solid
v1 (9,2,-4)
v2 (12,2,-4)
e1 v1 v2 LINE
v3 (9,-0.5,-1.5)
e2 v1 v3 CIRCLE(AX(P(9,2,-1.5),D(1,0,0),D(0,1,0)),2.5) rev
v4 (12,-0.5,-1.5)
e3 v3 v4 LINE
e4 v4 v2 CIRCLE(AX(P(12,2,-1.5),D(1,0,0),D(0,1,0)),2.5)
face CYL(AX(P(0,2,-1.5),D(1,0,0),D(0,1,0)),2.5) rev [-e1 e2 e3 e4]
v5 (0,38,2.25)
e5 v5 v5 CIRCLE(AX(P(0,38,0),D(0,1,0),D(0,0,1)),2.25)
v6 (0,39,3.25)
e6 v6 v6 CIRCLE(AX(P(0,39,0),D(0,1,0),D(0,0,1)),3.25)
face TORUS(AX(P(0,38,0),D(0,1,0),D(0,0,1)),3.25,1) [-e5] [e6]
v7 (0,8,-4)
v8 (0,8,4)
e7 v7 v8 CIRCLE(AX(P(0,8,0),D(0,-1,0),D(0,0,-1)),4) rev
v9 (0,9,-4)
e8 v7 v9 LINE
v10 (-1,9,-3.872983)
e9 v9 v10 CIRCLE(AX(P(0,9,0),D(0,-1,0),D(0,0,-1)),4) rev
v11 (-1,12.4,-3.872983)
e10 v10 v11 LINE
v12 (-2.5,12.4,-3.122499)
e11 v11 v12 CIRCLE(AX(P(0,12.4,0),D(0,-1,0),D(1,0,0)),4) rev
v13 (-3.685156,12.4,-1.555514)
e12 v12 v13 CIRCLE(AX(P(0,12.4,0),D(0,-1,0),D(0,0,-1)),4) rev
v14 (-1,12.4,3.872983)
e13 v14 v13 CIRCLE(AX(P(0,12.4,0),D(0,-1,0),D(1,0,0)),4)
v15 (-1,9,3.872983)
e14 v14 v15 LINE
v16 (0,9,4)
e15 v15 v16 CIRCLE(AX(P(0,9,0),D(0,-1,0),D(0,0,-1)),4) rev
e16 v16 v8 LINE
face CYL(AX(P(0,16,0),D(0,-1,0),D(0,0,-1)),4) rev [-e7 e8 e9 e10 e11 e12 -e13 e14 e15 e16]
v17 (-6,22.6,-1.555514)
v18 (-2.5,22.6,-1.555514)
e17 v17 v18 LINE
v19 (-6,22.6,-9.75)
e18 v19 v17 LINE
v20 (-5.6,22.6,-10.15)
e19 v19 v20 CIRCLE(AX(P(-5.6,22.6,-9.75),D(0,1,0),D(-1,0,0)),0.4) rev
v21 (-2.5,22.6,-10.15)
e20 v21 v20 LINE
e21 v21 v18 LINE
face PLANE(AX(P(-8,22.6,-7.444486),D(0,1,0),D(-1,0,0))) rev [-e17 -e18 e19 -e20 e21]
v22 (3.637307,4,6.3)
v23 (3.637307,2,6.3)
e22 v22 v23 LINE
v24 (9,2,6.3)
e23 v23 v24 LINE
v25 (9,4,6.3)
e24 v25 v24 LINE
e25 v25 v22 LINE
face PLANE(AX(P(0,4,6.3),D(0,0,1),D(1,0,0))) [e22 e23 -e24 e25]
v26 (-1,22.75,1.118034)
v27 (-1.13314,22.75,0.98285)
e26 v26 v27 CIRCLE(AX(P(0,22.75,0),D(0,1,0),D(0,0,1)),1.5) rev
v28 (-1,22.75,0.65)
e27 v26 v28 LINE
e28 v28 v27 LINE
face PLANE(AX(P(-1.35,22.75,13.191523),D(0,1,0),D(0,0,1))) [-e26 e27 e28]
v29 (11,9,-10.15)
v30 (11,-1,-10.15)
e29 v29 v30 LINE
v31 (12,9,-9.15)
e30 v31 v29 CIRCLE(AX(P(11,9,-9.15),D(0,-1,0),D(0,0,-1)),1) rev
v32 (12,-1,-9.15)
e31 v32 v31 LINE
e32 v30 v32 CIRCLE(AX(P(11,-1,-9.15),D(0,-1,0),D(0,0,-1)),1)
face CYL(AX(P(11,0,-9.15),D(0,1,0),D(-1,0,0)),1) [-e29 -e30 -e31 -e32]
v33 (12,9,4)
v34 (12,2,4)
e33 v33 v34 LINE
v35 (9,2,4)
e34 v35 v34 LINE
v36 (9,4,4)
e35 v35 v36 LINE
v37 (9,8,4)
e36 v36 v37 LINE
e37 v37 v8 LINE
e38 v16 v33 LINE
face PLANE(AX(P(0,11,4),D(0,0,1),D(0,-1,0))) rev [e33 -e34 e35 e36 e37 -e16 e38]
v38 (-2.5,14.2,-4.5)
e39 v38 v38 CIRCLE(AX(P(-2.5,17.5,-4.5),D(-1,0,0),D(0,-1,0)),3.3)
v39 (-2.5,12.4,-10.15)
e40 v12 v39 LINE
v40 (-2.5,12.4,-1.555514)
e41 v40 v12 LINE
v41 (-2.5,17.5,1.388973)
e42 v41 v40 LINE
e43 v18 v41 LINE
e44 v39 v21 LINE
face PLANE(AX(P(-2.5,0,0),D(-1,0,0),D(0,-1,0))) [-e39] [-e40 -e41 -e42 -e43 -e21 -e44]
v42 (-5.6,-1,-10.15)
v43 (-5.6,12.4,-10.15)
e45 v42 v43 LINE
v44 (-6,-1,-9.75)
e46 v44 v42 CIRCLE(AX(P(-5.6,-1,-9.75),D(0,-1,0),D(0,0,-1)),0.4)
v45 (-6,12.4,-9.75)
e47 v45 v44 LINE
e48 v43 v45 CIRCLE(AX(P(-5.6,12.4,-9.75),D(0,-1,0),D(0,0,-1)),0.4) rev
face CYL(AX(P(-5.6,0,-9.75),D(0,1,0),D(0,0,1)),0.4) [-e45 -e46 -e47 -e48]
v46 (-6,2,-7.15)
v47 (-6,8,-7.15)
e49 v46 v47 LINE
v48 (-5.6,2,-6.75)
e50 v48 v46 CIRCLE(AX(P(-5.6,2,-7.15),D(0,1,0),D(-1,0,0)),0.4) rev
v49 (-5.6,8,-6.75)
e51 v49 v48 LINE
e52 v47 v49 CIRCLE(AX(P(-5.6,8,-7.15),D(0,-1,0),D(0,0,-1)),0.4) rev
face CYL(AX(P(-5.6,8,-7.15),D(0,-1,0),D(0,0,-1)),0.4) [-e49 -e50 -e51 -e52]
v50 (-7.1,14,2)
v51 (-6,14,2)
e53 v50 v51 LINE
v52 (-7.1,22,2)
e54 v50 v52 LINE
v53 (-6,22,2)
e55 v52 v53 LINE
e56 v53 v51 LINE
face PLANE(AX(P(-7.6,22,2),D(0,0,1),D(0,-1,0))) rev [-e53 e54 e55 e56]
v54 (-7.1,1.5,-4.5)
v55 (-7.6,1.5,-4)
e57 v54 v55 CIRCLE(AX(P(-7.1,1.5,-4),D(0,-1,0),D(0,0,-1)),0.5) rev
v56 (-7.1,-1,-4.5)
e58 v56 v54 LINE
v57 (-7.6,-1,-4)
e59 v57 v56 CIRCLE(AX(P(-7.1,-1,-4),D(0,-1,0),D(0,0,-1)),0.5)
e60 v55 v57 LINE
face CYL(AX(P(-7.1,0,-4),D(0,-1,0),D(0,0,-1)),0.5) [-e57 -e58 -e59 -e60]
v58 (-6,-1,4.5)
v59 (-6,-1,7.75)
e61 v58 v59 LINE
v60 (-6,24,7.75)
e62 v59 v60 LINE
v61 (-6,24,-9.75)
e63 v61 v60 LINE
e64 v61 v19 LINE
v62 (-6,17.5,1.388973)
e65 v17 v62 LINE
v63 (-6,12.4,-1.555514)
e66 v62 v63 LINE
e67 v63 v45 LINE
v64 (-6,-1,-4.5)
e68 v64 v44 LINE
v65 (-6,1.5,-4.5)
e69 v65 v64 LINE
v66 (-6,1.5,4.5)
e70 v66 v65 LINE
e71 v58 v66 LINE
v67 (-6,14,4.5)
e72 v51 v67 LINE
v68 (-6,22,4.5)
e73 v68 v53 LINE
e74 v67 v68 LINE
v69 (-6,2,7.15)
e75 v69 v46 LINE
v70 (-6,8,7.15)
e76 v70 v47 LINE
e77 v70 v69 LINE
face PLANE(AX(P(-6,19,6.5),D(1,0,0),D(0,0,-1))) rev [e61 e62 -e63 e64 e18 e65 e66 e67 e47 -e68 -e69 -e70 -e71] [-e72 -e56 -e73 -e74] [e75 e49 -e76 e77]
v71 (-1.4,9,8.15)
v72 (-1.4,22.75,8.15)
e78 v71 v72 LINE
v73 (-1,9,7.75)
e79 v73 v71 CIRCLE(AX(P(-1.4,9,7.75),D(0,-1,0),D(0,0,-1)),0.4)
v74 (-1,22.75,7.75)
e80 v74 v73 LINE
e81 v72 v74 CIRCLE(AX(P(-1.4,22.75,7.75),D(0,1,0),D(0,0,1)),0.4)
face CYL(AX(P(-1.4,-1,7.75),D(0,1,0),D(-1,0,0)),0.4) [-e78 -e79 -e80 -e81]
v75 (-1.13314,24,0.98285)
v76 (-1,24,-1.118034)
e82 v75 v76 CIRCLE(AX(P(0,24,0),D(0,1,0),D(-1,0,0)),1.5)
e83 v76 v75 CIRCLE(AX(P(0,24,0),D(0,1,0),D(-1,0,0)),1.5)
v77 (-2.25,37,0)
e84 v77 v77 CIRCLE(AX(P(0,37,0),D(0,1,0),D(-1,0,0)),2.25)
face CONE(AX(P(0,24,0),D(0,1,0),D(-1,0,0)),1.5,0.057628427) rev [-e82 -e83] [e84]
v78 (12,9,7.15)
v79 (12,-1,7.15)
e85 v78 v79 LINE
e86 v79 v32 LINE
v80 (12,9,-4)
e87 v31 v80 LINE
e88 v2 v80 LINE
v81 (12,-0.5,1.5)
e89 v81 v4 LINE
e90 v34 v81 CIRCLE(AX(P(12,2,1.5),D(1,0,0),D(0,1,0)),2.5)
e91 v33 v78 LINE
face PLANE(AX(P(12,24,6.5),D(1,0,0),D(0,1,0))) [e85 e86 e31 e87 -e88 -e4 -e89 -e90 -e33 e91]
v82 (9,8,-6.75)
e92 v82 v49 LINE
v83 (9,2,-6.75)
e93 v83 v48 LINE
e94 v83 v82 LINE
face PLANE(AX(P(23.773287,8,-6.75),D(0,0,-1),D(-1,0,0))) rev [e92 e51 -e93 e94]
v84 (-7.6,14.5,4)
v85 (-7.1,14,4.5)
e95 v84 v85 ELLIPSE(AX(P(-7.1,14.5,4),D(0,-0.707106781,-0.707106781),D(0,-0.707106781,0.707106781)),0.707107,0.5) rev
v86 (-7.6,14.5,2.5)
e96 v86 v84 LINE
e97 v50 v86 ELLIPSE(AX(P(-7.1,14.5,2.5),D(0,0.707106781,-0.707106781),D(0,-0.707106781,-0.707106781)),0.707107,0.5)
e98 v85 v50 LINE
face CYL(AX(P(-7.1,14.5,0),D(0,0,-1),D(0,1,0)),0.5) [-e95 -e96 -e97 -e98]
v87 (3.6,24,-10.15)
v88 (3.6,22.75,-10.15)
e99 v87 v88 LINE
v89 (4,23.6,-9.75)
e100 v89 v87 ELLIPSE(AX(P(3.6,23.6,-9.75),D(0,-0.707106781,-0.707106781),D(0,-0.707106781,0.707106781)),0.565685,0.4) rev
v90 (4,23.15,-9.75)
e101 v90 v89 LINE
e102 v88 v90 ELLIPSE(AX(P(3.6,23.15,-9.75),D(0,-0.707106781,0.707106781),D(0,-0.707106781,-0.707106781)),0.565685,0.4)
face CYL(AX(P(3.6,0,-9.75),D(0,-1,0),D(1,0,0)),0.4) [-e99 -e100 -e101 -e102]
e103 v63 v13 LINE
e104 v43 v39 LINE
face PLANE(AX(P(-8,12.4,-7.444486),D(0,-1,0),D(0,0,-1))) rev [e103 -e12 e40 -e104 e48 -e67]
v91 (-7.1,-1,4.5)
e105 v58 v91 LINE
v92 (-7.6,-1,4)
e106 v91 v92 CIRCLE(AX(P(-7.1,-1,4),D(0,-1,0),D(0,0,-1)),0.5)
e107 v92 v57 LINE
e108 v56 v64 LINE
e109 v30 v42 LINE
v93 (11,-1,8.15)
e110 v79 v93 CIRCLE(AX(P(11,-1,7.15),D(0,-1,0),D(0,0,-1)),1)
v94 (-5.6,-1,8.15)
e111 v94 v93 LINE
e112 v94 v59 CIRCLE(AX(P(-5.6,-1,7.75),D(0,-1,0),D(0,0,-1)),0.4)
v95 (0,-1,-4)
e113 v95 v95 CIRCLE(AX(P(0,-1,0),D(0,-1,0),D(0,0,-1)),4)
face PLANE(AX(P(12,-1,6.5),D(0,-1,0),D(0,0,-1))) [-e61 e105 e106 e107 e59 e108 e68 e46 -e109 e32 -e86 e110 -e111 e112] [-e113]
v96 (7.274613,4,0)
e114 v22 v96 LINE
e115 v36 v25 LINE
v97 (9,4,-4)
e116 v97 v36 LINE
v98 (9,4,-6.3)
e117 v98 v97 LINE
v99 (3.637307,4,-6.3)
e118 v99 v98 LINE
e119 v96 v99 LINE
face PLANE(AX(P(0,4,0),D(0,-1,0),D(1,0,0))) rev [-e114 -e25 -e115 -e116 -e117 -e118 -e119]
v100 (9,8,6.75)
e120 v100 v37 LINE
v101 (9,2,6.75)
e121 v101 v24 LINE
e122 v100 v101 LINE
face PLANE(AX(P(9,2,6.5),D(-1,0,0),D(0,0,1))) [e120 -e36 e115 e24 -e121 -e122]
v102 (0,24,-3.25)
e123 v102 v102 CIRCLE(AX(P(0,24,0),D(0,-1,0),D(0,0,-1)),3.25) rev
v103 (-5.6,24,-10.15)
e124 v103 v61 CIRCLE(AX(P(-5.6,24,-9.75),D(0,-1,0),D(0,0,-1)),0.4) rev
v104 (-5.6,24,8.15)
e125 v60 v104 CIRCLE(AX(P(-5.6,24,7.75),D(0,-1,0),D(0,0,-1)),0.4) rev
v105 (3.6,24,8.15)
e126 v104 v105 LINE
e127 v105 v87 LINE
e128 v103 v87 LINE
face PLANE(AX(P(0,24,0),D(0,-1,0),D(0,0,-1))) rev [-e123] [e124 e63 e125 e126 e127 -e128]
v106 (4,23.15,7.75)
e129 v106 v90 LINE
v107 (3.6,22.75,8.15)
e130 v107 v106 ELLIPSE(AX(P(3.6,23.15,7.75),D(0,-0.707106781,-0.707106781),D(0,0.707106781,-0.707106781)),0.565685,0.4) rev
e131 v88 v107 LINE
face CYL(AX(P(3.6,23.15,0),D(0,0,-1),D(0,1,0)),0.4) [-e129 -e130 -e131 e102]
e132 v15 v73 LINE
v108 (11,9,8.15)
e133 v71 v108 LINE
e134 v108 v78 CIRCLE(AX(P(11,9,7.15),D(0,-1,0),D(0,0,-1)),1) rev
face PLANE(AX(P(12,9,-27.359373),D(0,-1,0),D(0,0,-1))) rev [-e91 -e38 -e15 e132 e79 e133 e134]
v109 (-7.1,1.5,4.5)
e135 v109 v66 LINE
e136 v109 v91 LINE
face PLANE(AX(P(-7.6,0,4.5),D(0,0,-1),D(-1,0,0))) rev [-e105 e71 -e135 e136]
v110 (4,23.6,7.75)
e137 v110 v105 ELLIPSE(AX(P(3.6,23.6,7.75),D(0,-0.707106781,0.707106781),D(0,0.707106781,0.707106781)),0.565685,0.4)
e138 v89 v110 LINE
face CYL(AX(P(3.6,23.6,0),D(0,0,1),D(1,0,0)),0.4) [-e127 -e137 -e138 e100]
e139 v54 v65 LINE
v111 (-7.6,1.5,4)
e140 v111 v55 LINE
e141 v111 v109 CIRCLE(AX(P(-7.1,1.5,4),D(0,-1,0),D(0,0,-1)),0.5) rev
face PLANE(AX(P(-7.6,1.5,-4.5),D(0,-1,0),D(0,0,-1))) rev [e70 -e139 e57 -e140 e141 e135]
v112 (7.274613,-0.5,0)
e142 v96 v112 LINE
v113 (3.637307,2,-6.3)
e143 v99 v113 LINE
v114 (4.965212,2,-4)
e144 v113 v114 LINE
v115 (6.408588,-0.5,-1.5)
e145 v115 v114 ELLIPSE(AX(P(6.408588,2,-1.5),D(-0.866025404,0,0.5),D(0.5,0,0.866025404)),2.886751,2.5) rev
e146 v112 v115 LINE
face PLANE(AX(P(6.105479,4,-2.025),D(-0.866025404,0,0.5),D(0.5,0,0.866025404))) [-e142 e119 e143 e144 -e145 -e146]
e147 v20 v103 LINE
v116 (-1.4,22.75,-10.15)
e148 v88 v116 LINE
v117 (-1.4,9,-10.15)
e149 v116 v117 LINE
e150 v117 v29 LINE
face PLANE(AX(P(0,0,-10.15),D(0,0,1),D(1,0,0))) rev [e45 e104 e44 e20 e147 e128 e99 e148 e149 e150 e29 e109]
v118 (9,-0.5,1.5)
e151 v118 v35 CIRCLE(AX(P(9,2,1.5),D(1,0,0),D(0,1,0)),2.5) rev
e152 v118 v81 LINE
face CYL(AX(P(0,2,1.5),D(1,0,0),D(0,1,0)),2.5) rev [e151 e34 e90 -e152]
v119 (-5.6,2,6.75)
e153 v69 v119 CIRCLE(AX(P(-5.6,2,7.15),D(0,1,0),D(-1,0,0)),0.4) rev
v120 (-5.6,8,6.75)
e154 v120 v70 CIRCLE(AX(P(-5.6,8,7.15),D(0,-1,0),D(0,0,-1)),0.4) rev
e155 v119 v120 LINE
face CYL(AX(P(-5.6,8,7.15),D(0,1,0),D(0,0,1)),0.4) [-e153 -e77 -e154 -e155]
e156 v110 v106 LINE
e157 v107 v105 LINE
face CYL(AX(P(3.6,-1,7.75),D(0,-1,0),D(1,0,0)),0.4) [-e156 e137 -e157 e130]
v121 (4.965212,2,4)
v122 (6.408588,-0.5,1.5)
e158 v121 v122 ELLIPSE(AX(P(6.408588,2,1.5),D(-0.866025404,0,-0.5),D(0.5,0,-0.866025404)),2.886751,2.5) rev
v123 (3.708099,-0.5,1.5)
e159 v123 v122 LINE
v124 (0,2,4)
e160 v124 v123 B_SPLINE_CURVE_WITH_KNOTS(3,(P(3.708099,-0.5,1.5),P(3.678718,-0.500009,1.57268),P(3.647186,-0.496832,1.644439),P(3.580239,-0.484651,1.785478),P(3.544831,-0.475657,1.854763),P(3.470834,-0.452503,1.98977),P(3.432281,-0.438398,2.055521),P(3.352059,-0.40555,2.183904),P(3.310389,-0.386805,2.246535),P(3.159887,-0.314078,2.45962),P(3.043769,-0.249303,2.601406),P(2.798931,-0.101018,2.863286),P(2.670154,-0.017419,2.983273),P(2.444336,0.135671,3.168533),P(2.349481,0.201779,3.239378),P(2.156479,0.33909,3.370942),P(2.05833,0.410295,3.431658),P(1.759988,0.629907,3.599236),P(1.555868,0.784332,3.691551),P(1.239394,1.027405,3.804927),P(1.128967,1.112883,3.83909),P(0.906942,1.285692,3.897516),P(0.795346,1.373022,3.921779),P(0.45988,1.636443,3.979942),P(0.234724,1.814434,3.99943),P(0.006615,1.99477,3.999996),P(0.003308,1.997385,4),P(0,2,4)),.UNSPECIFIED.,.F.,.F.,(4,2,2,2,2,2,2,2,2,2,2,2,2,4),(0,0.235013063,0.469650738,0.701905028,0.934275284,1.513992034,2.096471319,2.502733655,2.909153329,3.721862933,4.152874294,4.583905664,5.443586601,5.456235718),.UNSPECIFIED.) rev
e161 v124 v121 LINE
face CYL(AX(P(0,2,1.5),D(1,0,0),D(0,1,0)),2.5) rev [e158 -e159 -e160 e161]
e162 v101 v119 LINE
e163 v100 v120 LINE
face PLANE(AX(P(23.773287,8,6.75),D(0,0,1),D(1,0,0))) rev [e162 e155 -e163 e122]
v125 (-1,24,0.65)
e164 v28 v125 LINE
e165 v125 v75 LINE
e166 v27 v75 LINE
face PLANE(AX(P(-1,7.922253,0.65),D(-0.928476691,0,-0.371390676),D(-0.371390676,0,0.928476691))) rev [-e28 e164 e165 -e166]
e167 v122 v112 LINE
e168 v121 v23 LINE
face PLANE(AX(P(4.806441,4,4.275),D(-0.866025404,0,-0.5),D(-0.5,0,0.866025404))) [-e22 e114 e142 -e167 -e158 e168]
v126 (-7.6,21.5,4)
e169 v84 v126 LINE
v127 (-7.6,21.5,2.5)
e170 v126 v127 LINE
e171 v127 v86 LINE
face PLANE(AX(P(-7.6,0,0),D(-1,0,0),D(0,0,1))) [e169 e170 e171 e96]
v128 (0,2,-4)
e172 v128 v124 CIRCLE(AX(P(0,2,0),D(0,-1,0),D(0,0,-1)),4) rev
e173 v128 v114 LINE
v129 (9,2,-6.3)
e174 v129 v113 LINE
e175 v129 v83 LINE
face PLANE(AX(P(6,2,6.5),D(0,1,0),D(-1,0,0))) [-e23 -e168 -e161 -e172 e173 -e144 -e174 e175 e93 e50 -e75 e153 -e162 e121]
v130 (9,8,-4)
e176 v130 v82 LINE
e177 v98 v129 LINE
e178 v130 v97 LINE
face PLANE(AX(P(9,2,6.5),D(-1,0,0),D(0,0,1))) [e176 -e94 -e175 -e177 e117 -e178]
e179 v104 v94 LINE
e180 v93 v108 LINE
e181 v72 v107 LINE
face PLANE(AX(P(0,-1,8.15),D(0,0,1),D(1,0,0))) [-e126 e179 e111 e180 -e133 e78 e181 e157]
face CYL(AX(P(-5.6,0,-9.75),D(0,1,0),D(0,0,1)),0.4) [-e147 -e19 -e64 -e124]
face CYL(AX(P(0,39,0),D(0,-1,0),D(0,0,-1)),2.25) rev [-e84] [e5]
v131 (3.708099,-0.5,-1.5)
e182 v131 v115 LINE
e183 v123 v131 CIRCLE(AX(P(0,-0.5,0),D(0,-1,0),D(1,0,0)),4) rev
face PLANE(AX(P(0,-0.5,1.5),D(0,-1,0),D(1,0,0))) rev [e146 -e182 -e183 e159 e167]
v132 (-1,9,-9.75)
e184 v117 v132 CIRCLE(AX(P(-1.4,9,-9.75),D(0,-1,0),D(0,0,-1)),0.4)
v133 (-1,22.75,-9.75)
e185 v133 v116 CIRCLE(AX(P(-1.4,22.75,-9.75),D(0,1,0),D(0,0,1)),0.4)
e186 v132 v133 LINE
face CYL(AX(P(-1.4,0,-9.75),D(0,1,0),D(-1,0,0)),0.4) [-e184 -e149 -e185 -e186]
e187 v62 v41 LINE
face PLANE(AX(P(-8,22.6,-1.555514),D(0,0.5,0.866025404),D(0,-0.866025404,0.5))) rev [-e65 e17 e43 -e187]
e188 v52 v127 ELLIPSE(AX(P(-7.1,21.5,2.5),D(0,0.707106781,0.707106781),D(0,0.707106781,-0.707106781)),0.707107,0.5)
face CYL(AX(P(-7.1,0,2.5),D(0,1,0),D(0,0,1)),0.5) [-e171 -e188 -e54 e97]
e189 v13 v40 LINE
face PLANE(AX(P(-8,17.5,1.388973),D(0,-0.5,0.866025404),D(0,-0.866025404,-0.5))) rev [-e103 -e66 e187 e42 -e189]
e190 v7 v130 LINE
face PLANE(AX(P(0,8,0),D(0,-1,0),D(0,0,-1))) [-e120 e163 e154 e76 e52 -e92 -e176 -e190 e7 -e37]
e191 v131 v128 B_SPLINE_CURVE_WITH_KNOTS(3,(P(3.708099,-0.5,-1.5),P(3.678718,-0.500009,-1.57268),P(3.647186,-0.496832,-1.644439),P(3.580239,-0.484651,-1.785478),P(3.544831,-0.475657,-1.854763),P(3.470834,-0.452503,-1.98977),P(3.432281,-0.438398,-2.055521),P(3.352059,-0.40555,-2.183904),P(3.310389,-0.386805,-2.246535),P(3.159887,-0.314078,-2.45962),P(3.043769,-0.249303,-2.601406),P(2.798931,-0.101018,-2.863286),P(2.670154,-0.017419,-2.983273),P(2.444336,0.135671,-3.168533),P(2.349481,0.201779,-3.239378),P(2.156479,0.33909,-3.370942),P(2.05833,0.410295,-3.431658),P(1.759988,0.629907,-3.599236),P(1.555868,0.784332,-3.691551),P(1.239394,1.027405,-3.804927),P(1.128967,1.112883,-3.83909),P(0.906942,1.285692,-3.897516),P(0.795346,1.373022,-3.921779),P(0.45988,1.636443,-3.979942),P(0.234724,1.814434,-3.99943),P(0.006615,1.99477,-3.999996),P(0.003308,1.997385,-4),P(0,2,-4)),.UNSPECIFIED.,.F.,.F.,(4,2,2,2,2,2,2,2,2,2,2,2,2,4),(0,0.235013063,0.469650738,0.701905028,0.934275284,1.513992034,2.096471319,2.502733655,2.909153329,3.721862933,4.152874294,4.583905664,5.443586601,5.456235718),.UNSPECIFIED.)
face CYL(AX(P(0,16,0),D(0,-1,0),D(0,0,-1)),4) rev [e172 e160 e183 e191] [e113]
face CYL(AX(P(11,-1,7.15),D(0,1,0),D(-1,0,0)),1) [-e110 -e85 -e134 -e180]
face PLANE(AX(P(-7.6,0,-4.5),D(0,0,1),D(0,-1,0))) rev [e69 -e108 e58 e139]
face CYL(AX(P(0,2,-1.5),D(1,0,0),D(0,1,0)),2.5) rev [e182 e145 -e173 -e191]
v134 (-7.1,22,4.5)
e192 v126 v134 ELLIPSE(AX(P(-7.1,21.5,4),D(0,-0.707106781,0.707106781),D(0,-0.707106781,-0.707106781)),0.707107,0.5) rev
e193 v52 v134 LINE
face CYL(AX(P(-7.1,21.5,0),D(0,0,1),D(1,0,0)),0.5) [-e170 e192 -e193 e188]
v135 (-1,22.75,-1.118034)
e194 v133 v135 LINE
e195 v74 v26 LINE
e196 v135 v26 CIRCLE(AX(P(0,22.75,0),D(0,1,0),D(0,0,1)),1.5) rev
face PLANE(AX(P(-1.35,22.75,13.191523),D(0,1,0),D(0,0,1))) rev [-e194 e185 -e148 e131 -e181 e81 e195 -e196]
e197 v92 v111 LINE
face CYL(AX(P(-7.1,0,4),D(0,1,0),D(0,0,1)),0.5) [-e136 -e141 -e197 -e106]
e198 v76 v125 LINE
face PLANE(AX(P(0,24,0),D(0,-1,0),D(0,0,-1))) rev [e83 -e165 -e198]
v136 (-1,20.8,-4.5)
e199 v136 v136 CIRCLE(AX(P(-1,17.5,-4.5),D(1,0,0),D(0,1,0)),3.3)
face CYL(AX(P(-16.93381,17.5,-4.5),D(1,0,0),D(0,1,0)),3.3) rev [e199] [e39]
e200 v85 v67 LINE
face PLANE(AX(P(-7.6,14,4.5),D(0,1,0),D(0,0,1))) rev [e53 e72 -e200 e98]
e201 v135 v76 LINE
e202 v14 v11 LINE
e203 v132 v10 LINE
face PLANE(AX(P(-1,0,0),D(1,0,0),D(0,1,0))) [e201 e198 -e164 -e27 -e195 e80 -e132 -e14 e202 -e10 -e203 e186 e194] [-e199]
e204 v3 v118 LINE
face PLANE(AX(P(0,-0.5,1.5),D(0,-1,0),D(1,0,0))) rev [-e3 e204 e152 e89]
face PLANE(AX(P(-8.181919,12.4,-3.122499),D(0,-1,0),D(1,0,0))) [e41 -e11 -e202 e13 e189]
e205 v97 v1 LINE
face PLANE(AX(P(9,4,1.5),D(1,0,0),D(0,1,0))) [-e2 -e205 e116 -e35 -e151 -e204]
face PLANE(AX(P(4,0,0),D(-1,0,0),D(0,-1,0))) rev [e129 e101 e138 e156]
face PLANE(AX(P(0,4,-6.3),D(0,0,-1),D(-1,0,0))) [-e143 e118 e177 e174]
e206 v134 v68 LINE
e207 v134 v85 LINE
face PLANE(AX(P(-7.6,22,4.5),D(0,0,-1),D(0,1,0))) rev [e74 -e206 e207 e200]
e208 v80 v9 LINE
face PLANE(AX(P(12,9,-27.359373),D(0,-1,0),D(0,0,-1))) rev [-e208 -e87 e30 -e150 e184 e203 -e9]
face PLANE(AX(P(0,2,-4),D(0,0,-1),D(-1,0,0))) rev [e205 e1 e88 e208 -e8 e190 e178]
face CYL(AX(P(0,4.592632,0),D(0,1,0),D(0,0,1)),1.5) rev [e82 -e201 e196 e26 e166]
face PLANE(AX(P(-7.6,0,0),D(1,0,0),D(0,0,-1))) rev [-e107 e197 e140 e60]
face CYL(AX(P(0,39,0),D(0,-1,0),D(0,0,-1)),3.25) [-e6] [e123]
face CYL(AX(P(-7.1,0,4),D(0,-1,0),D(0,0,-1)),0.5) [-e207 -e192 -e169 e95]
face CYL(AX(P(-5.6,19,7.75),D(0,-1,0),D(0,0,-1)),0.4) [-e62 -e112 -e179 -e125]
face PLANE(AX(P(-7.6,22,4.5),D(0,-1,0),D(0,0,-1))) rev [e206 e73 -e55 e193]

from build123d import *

# Parameters (mm, degrees)
SKETCH1_W                        = 12
SKETCH1_H                        = 13
BOSS_EXTRUDE1_DEPTH              = 19
SKETCH2_R                        = 4
CUT_EXTRUDE1_DEPTH               = 16
CUT_EXTRUDE2_START               = -2
SKETCH3_W                        = 12
SKETCH3_H                        = 13
CUT_EXTRUDE2_DEPTH               = 6
SKETCH5_W                        = 12
SKETCH5_H                        = 13
BOSS_EXTRUDE2_DEPTH              = 5
FILLET1_R                        = 2
FILLET4_R                        = 2
SKETCH21_W                       = 2.5
SKETCH21_H                       = 8
SKETCH21_W_2                     = 9
SKETCH21_H_2                     = 1.5
BOSS_EXTRUDE4_DEPTH              = 1.6
FILLET3_R                        = 0.5
FILLET7_R                        = 0.5
FILLET5_R                        = 0.5
SKETCH23_R                       = 4
BOSS_EXTRUDE5_DEPTH              = 1
BOSS_EXTRUDE6_DEPTH              = 13
BOSS_EXTRUDE7_DEPTH              = 25
SKETCH34_W                       = 13.5
SKETCH34_H                       = 6
CUT_EXTRUDE5_DEPTH               = 15
M2_5_CLEARANCE_HOLE1_D           = 2.9
M2_5_CLEARANCE_HOLE1_DEPTH       = 19.128752102
M2_5_CLEARANCE_HOLE1_TIP         = 0.871247898
FILLET8_R                        = 0.4
SKETCH31_R                       = 3.25
SKETCH31_R_2                     = 2.25
BOSS_EXTRUDE8_DEPTH              = 15
FILLET9_R                        = 1
SKETCH9_R                        = 1
CUT_EXTRUDE6_DEPTH               = 29.903676278
CUT_EXTRUDE8_DEPTH               = 12
BOSS_EXTRUDE9_START              = -2.5
BOSS_EXTRUDE9_DEPTH              = 4.5
FILLET10_R                       = 1
CUT_EXTRUDE9_REACH               = 45.94
SKETCH48_W                       = 12
SKETCH48_H                       = 15
CUT_EXTRUDE10_START              = -2.5
CUT_EXTRUDE10_DEPTH              = 5.5
SKETCH50_W                       = 16.3
SKETCH50_H                       = 8
CUT_EXTRUDE11_DEPTH              = 1
CUT_EXTRUDE13_DEPTH              = 8
SKETCH51_W                       = 2.5
SKETCH51_H                       = 8
BOSS_EXTRUDE10_DEPTH             = 5
BOSS_EXTRUDE10_DIRECTION_2_REACH = 43.91
CUT_EXTRUDE12_DEPTH              = 2.5
CUT_EXTRUDE14_START              = -1.25
CUT_EXTRUDE14_DEPTH              = 5.5
BOSS_EXTRUDE11_DEPTH             = 1.25
SKETCH58_R                       = 3.3
CUT_EXTRUDE16_DEPTH              = 6.6
SKETCH65_W                       = 1
SKETCH65_H                       = 16.3
CUT_EXTRUDE17_DEPTH              = 7
BOSS_EXTRUDE12_DEPTH             = 2
FILLET11_R                       = 1
CUT_EXTRUDE18_DEPTH              = 6.75
BOSS_EXTRUDE13_DEPTH             = 6.75
FILLET12_R                       = 0.4
FILLET13_R                       = 0.4
BOSS_EXTRUDE18_DEPTH             = 1.5
BOSS_EXTRUDE19_REACH             = 44.344


with BuildPart() as part:
    # Sketch1 → Boss-Extrude1 (new body)
    with BuildSketch(Plane(origin=(0, 0, 0), x_dir=(1, 0, 0), z_dir=(0, 1, 0))):
        Rectangle(SKETCH1_W, SKETCH1_H)
    extrude(amount=BOSS_EXTRUDE1_DEPTH)

    # Sketch2 → Cut-Extrude1 (cut)
    with BuildSketch(Plane.XZ):
        with Locations(Location((0, 0, 0), (0, 0, 270))):
            Circle(SKETCH2_R)
    extrude(amount=-CUT_EXTRUDE1_DEPTH, mode=Mode.SUBTRACT)

    # Sketch3 → Cut-Extrude2 (cut)
    with BuildSketch(Plane.XZ.offset(CUT_EXTRUDE2_START)):
        Rectangle(SKETCH3_W, SKETCH3_H)
    extrude(amount=-CUT_EXTRUDE2_DEPTH, mode=Mode.SUBTRACT)


with BuildPart() as cut_extrude2_piece_1:
    # of the separate pieces the step leaves, piece 1, a body of its own (cut_extrude2_pieces)
    add(part.part.solids().sort_by_distance((-6, 8, 6.5))[0])

    # Sketch5 → Boss-Extrude2 (add)
    with BuildSketch(Plane(origin=(0, 19, 0), x_dir=(1, 0, 0), z_dir=(0, 1, 0))):
        Rectangle(SKETCH5_W, SKETCH5_H)
    extrude(amount=BOSS_EXTRUDE2_DEPTH)

    # Fillet1
    fillet1_edges = [cut_extrude2_piece_1.edges().sort_by_distance(p)[0] for p in [
        (-6, 16, -6.5),
        (-6, 16, 6.5),
    ]]
    fillet(fillet1_edges, radius=FILLET1_R)



with BuildPart() as cut_extrude2_piece_2:
    # of the separate pieces the step leaves, piece 2, a body of its own (cut_extrude2_pieces)
    add(part.part.solids().sort_by_distance((-6, 0, 6.5))[0])

    # Fillet4
    fillet4_edges = [cut_extrude2_piece_2.edges().sort_by_distance(p)[0] for p in [
        (-6, 1, 6.5),
        (-6, 1, -6.5),
    ]]
    fillet(fillet4_edges, radius=FILLET4_R)

    # Sketch21 → Boss-Extrude4 (add)
    with BuildSketch(Plane.ZY.offset(6)):
        with Locations((-3.25, 18)):
            Rectangle(SKETCH21_W, SKETCH21_H)
        with Locations((3.25, 18)):
            Rectangle(SKETCH21_W, SKETCH21_H)
        with Locations((0, 0.75)):
            Rectangle(SKETCH21_W_2, SKETCH21_H_2)
    extrude(amount=BOSS_EXTRUDE4_DEPTH)


with BuildPart() as boss_extrude4_piece_1:
    # of the separate pieces the step leaves, piece 1, a body of its own (boss_extrude4_pieces)
    add(cut_extrude2_piece_2.part.solids().sort_by_distance((-4, 0, 6.5))[0])

    # Fillet5
    fillet5_edges = [boss_extrude4_piece_1.edges().sort_by_distance(p)[0] for p in [
        (-7.6, 0.75, -4.5),
        (-7.6, 0.75, 4.5),
    ]]
    fillet(fillet5_edges, radius=FILLET5_R)

    # Sketch23 → Boss-Extrude5 (add)
    with BuildSketch(Plane.XZ):
        with BuildLine():
            Line((-7.6, 4), (-7.6, -4))
            ThreePointArc((-7.6, -4), (-7.453553391, -4.353553391), (-7.1, -4.5))
            Line((-7.1, -4.5), (-6, -4.5))
            ThreePointArc((-6, -4.5), (-5.414213562, -5.914213562), (-4, -6.5))
            Line((-4, -6.5), (6, -6.5))
            Line((6, -6.5), (6, 6.5))
            Line((6, 6.5), (-4, 6.5))
            ThreePointArc((-4, 6.5), (-5.414213562, 5.914213562), (-6, 4.5))
            Line((-6, 4.5), (-7.1, 4.5))
            ThreePointArc((-7.1, 4.5), (-7.453553391, 4.353553391), (-7.6, 4))
        make_face()
        with Locations(Location((0, 0, 0), (0, 0, 270))):
            Circle(SKETCH23_R, mode=Mode.SUBTRACT)
    extrude(amount=BOSS_EXTRUDE5_DEPTH)


with BuildPart() as boss_extrude4_piece_2:
    # of the separate pieces the step leaves, piece 2, a body of its own (boss_extrude4_pieces)
    add(cut_extrude2_piece_2.part.solids().sort_by_distance((-6, 22, -4.5))[0])

    # Fillet7
    fillet7_edges = [boss_extrude4_piece_2.edges().sort_by_distance(p)[0] for p in [
        (-7.6, 18, -2),
        (-7.6, 22, -3.25),
        (-7.6, 18, -4.5),
        (-7.6, 14, -3.25),
    ]]
    fillet(fillet7_edges, radius=FILLET7_R)


with BuildPart() as boss_extrude4_piece_3:
    # of the separate pieces the step leaves, piece 3, a body of its own (boss_extrude4_pieces)
    add(cut_extrude2_piece_2.part.solids().sort_by_distance((-6, 22, 2))[0])

    # Fillet3
    fillet3_edges = [boss_extrude4_piece_3.edges().sort_by_distance(p)[0] for p in [
        (-7.6, 22, 3.25),
        (-7.6, 18, 2),
        (-7.6, 14, 3.25),
        (-7.6, 18, 4.5),
    ]]
    fillet(fillet3_edges, radius=FILLET3_R)


with BuildPart() as cut_extrude2_piece_1_1:
    add(cut_extrude2_piece_1.part)

    add(boss_extrude4_piece_1.part)  # Boss-Extrude6 merges Boss-Extrude4 piece 1
    # Sketch26 → Boss-Extrude6 (add, through all)
    with BuildSketch(Plane(origin=(0, 0, -6.5), x_dir=(-1, 0, 0), z_dir=(0, 0, -1))):
        Polygon((-6, 24), (-12, 24), (-12, -1), (-6, -1), (-6, 2), (-9, 2), (-9, 8), (-6, 8), align=None)
    extrude(amount=-BOSS_EXTRUDE6_DEPTH)


    add(boss_extrude4_piece_2.part)  # Boss-Extrude7 merges Boss-Extrude4 piece 2

    add(boss_extrude4_piece_3.part)  # Boss-Extrude7 merges Boss-Extrude4 piece 3
    # Sketch30 → Boss-Extrude7 (add, through all)
    with BuildSketch(Plane(origin=(0, 24, 0), x_dir=(1, 0, 0), z_dir=(0, 1, 0))):
        with BuildLine():
            ThreePointArc((-6, 4.5), (-5.414213562, 5.914213562), (-4, 6.5))
            Line((-4, 6.5), (12, 6.5))
            Line((12, 6.5), (12, 8.15))
            Line((12, 8.15), (-6, 8.15))
            Line((-6, 8.15), (-6, 4.5))
        make_face()
        with BuildLine():
            Line((12, -6.5), (-4, -6.5))
            ThreePointArc((-4, -6.5), (-5.414213562, -5.914213562), (-6, -4.5))
            Line((-6, -4.5), (-6, -8.15))
            Line((-6, -8.15), (12, -8.15))
            Line((12, -8.15), (12, -6.5))
        make_face()
    extrude(amount=-BOSS_EXTRUDE7_DEPTH)

    # Sketch34 → Cut-Extrude5 (cut)
    with BuildSketch(Plane.ZY.offset(6)):
        with Locations((0, 5)):
            Rectangle(SKETCH34_W, SKETCH34_H)
    extrude(amount=-CUT_EXTRUDE5_DEPTH, mode=Mode.SUBTRACT)

    # M2.5 Clearance Hole1
    with Locations(Plane(origin=(12, 0, 0), x_dir=(0, 0, -1), z_dir=(1, 0, 0))):
        with Locations((4.5, 17.5)):
            Hole(M2_5_CLEARANCE_HOLE1_D / 2, depth=M2_5_CLEARANCE_HOLE1_DEPTH)
            with Locations((0, 0, -(M2_5_CLEARANCE_HOLE1_DEPTH + M2_5_CLEARANCE_HOLE1_TIP / 2))):  # 118° drill point
                Cone(0, M2_5_CLEARANCE_HOLE1_D / 2, M2_5_CLEARANCE_HOLE1_TIP, mode=Mode.SUBTRACT)

    # Fillet8
    fillet8_edges = [cut_extrude2_piece_1_1.edges().sort_by_distance(p)[0] for p in [
        (-6, 11.5, 8.15),
        (-6, 5, 6.75),
        (-6, 5, -6.75),
    ]]
    fillet(fillet8_edges, radius=FILLET8_R)

    # Sketch31 → Boss-Extrude8 (add)
    with BuildSketch(Plane(origin=(0, 24, 0), x_dir=(1, 0, 0), z_dir=(0, 1, 0))):
        with Locations(Location((0, 0, 0), (0, 0, 90))):
            Circle(SKETCH31_R)
        with Locations(Location((0, 0, 0), (0, 0, 270))):
            Circle(SKETCH31_R_2, mode=Mode.SUBTRACT)
    extrude(amount=BOSS_EXTRUDE8_DEPTH)

    # Fillet9
    fillet9_edges = [cut_extrude2_piece_1_1.edges().sort_by_distance(p)[0] for p in [
        (12, 11.5, 8.15),
    ]]
    fillet(fillet9_edges, radius=FILLET9_R)

    # Sketch9 → Cut-Extrude6 (cut, through all)
    with BuildSketch(Plane(origin=(0, 24, 0), x_dir=(1, 0, 0), z_dir=(0, 1, 0))):
        with Locations(Location((0, 0, 0), (0, 0, 270))):
            Circle(SKETCH9_R)
    extrude(amount=-CUT_EXTRUDE6_DEPTH, mode=Mode.SUBTRACT)

    # Sketch42 → Cut-Extrude8 (cut)
    with BuildSketch(Plane(origin=(12, 0, 0), x_dir=(0, 0, -1), z_dir=(1, 0, 0))):
        with BuildLine():
            Line((-1.5, 13.5), (1.5, 13.5))
            ThreePointArc((1.5, 13.5), (3.267766953, 12.767766953), (4, 11))
            Line((4, 11), (4, 2))
            ThreePointArc((4, 2), (3.267766953, 0.232233047), (1.5, -0.5))
            Line((1.5, -0.5), (-1.5, -0.5))
            ThreePointArc((-1.5, -0.5), (-3.267766953, 0.232233047), (-4, 2))
            Line((-4, 2), (-4, 11))
            ThreePointArc((-4, 11), (-3.267766953, 12.767766953), (-1.5, 13.5))
        make_face()
    extrude(amount=-CUT_EXTRUDE8_DEPTH, mode=Mode.SUBTRACT)

    # Sketch43 → Revolve1 (revolve)
    with BuildSketch(Plane.XY, mode=Mode.PRIVATE) as revolve1_sk:
        Polygon((1.5, 24), (2.25, 24), (2.25, 37), align=None)
    revolve(revolve1_sk.sketch.rotate(Axis((0, 39, 0), (0, -1, 0)), 180), axis=Axis((0, 39, 0), (0, -1, 0)))

    # Sketch45 → Boss-Extrude9 (add)
    with BuildSketch(Plane(origin=(0, 2, 0), x_dir=(1, 0, 0), z_dir=(0, 1, 0)).offset(BOSS_EXTRUDE9_START)):
        Polygon((3.637306696, -6.3), (7.274613392, 0), (3.637306696, 6.3), (9, 6.3), (9, -6.3), align=None)
    extrude(amount=BOSS_EXTRUDE9_DEPTH)

    # Fillet10
    fillet10_edges = [cut_extrude2_piece_1_1.edges().sort_by_distance(p)[0] for p in [
        (0, 39, -2.25),
    ]]
    fillet(fillet10_edges, radius=FILLET10_R - 0.0001)  # a hair under: the kernel refuses the full size

    # Cut-Extrude9: up to this face of the body (flat: up to its plane)
    cut_extrude9_end = Plane(cut_extrude2_piece_1_1.part.faces().sort_by_distance((3, 11.5, -8.15))[0])
    # Sketch48 → Cut-Extrude9 (cut, up to the picked face)
    with BuildSketch(Plane.XY.offset(8.15), mode=Mode.PRIVATE) as cut_extrude9_sk1:
        with Locations((6, 16.5)):
            Rectangle(SKETCH48_W, SKETCH48_H)
    cut_extrude9_tool1 = split(extrude(cut_extrude9_sk1.sketch, amount=-CUT_EXTRUDE9_REACH, mode=Mode.PRIVATE), bisect_by=cut_extrude9_end, keep=Keep.BOTH, mode=Mode.PRIVATE)
    add(cut_extrude9_tool1.solids().sort_by(Axis((6, 16.5, 8.15), (0, 0, -1)))[0], mode=Mode.SUBTRACT)

    # Sketch49 → Cut-Extrude10 (cut)
    with BuildSketch(Plane(origin=(0, 0, 0), x_dir=(0, 0, -1), z_dir=(1, 0, 0)).offset(CUT_EXTRUDE10_START)):
        Polygon((7.444486373, 22.6), (8.15, 22.6), (8.15, 12.4), (7.444486373, 12.4), (1.555513627, 12.4), (-1.388972746, 17.5), (1.555513627, 22.6), align=None)
    extrude(amount=-CUT_EXTRUDE10_DEPTH, mode=Mode.SUBTRACT)

    # Sketch50 → Cut-Extrude11 (cut)
    with BuildSketch(Plane(origin=(0, 0, 0), x_dir=(0, 0, -1), z_dir=(1, 0, 0))):
        with Locations((0, 20)):
            Rectangle(SKETCH50_W, SKETCH50_H)
    extrude(amount=-CUT_EXTRUDE11_DEPTH, mode=Mode.SUBTRACT)

    # Sketch56 → Cut-Extrude13 (cut)
    with BuildSketch(Plane(origin=(0, 24, 0), x_dir=(1, 0, 0), z_dir=(0, 1, 0))):
        Polygon((-1, -8.15), (-1, -0.65), (-4, -8.15), align=None)
    extrude(amount=-CUT_EXTRUDE13_DEPTH, mode=Mode.SUBTRACT)

    # Sketch51 → Boss-Extrude10 (add)
    with BuildSketch(Plane(origin=(-1, 0, 0), x_dir=(0, 0, -1), z_dir=(1, 0, 0))):
        with Locations((-5.9, 20)):
            Rectangle(SKETCH51_W, SKETCH51_H)
    extrude(amount=BOSS_EXTRUDE10_DEPTH)

    # Boss-Extrude10 direction 2: up to this plane
    boss_extrude10_direction_2_end = Plane(origin=(-1, 7.922252789, 0.65), z_dir=(-0.9284766908852594, 0, -0.3713906763541036))
    # Sketch51 → Boss-Extrude10 direction 2 (add, up to the surface)
    with BuildSketch(Plane(origin=(-1, 0, 0), x_dir=(0, 0, -1), z_dir=(1, 0, 0)), mode=Mode.PRIVATE) as boss_extrude10_direction_2_sk1:
        with Locations((-5.9, 20)):
            Rectangle(SKETCH51_W, SKETCH51_H)
    boss_extrude10_direction_2_tool1 = split(extrude(boss_extrude10_direction_2_sk1.sketch, amount=-BOSS_EXTRUDE10_DIRECTION_2_REACH, mode=Mode.PRIVATE), bisect_by=boss_extrude10_direction_2_end, keep=Keep.BOTH, mode=Mode.PRIVATE)
    add(boss_extrude10_direction_2_tool1.solids().sort_by_distance((-1, 20, 5.9))[0])

    # Sketch54 → Cut-Extrude12 (cut)
    with BuildSketch(Plane(origin=(0, 0, 4.65), x_dir=(-1, 0, 0), z_dir=(0, 0, -1))):
        with BuildLine():
            Line((1.35, 22.75), (2.6, 22.75))
            Line((2.6, 22.75), (2.6, 20.25))
            Line((2.6, 20.25), (2.6, 19.75))
            Line((2.6, 19.75), (2.6, 17.25))
            Line((2.6, 17.25), (1.35, 17.25))
            ThreePointArc((1.35, 17.25), (0.466116524, 17.616116524), (0.1, 18.5))
            Line((0.1, 18.5), (0.1, 21.5))
            ThreePointArc((0.1, 21.5), (0.466116524, 22.383883476), (1.35, 22.75))
        make_face()
    extrude(amount=-CUT_EXTRUDE12_DEPTH, mode=Mode.SUBTRACT)

    # Sketch57 → Cut-Extrude14 (cut)
    with BuildSketch(Plane(origin=(0, 24, 0), x_dir=(1, 0, 0), z_dir=(0, 1, 0)).offset(CUT_EXTRUDE14_START)):
        Polygon((-2.6, -4.65), (-3.6, -7.15), (-2.6, -7.15), align=None)
    extrude(amount=-CUT_EXTRUDE14_DEPTH, mode=Mode.SUBTRACT)

    # Sketch59 → Boss-Extrude11 (add)
    with BuildSketch(Plane.XZ.offset(-24)):
        with BuildLine():
            Line((-1, -1.118033989), (-1, -8.15))
            Line((-1, -8.15), (4, -8.15))
            Line((4, -8.15), (4, 8.15))
            Line((4, 8.15), (-1.133139947, 8.15))
            Line((-1.133139947, 8.15), (-4, 8.15))
            Line((-4, 8.15), (-1.133139947, 0.982849867))
            ThreePointArc((-1.133139947, 0.982849867), (1.496996911, 0.094869637), (-1, -1.118033989))
        make_face()
    extrude(amount=BOSS_EXTRUDE11_DEPTH)

    # Sketch58 → Cut-Extrude16 (cut)
    with BuildSketch(Plane(origin=(-1, 0, 0), x_dir=(0, 0, -1), z_dir=(1, 0, 0))):
        with Locations((4.5, 17.5)):
            Circle(SKETCH58_R)
    extrude(amount=-CUT_EXTRUDE16_DEPTH, mode=Mode.SUBTRACT)

    # Sketch65 → Cut-Extrude17 (cut)
    with BuildSketch(Plane(origin=(0, 16, 0), x_dir=(1, 0, 0), z_dir=(0, 1, 0))):
        with Locations((-0.5, 0)):
            Rectangle(SKETCH65_W, SKETCH65_H)
    extrude(amount=-CUT_EXTRUDE17_DEPTH, mode=Mode.SUBTRACT)

    # Sketch67 → Boss-Extrude12 (add)
    with BuildSketch(Plane(origin=(0, 0, -8.15), x_dir=(-1, 0, 0), z_dir=(0, 0, -1))):
        Polygon((6, -1), (6, 12.4), (2.5, 12.4), (2.5, 22.6), (6, 22.6), (6, 24), (-4, 24), (-4, 22.75), (1, 22.75), (1, 9), (-12, 9), (-12, -1), align=None)
    extrude(amount=BOSS_EXTRUDE12_DEPTH)

    # Fillet11
    fillet11_edges = [cut_extrude2_piece_1_1.edges().sort_by_distance(p)[0] for p in [
        (12, 4, -10.15),
    ]]
    fillet(fillet11_edges, radius=FILLET11_R)

    # Sketch68 → Cut-Extrude18 (cut)
    with BuildSketch(Plane.XZ.offset(-16)):
        Polygon((4, 4.65), (-2.6, 4.65), (-3.309686066, 6.424215166), (-3.6, 7.15), (-2.6, 7.15), (4, 7.15), align=None)
    extrude(amount=-CUT_EXTRUDE18_DEPTH, mode=Mode.SUBTRACT)

    # Sketch69 → Boss-Extrude13 (add)
    with BuildSketch(Plane(origin=(0, 16, 0), x_dir=(1, 0, 0), z_dir=(0, 1, 0))):
        Polygon((-4, -8.15), (-1, -8.15), (-1, -0.65), align=None)
    extrude(amount=BOSS_EXTRUDE13_DEPTH)

    # Fillet12
    fillet12_edges = [cut_extrude2_piece_1_1.edges().sort_by_distance(p)[0] for p in [
        (-6, 5.7, -10.15),
        (-6, 23.3, -10.15),
    ]]
    fillet(fillet12_edges, radius=FILLET12_R)

    # Fillet13
    fillet13_edges = [cut_extrude2_piece_1_1.edges().sort_by_distance(p)[0] for p in [
        (4, 24, -1),
        (4, 22.75, -1),
        (4, 23.375, 8.15),
        (-1, 15.875, 8.15),
        (-1, 15.875, -10.15),
        (4, 23.375, -10.15),
    ]]
    fillet(fillet13_edges, radius=FILLET13_R)

    # Sketch74 → Boss-Extrude18 (add)
    with BuildSketch(Plane(origin=(-1, 0, 0), x_dir=(0, 0, -1), z_dir=(1, 0, 0))):
        with BuildLine():
            Line((1.555513627, 12.4), (3.122498999, 12.4))
            Line((3.122498999, 12.4), (3.872983346, 12.4))
            Line((3.872983346, 12.4), (3.872983346, 14.260115725))
            ThreePointArc((3.872983346, 14.260115725), (2.515910962, 14.863071732), (1.560612309, 16))
            Line((1.560612309, 16), (-0.522947342, 16))
            Line((-0.522947342, 16), (1.555513627, 12.4))
        make_face()
    extrude(amount=-BOSS_EXTRUDE18_DEPTH)

    # Sketch75 → Boss-Extrude19 (add, up to next)
    with BuildSketch(Plane(origin=(-1, 0, 0), x_dir=(0, 0, -1), z_dir=(1, 0, 0)), mode=Mode.PRIVATE) as boss_extrude19_sk1:
        Polygon((1.555513627, 12.4), (-3.872983346, 12.4), (-3.872983346, 16), (-0.522947342, 16), align=None)
    boss_extrude19_tool1 = extrude(boss_extrude19_sk1.sketch, amount=-BOSS_EXTRUDE19_REACH, mode=Mode.PRIVATE) - cut_extrude2_piece_1_1.part
    add(boss_extrude19_tool1.solids().sort_by_distance((-1, 14.05794, 1.637341))[0])


solid = cut_extrude2_piece_1_1.part
